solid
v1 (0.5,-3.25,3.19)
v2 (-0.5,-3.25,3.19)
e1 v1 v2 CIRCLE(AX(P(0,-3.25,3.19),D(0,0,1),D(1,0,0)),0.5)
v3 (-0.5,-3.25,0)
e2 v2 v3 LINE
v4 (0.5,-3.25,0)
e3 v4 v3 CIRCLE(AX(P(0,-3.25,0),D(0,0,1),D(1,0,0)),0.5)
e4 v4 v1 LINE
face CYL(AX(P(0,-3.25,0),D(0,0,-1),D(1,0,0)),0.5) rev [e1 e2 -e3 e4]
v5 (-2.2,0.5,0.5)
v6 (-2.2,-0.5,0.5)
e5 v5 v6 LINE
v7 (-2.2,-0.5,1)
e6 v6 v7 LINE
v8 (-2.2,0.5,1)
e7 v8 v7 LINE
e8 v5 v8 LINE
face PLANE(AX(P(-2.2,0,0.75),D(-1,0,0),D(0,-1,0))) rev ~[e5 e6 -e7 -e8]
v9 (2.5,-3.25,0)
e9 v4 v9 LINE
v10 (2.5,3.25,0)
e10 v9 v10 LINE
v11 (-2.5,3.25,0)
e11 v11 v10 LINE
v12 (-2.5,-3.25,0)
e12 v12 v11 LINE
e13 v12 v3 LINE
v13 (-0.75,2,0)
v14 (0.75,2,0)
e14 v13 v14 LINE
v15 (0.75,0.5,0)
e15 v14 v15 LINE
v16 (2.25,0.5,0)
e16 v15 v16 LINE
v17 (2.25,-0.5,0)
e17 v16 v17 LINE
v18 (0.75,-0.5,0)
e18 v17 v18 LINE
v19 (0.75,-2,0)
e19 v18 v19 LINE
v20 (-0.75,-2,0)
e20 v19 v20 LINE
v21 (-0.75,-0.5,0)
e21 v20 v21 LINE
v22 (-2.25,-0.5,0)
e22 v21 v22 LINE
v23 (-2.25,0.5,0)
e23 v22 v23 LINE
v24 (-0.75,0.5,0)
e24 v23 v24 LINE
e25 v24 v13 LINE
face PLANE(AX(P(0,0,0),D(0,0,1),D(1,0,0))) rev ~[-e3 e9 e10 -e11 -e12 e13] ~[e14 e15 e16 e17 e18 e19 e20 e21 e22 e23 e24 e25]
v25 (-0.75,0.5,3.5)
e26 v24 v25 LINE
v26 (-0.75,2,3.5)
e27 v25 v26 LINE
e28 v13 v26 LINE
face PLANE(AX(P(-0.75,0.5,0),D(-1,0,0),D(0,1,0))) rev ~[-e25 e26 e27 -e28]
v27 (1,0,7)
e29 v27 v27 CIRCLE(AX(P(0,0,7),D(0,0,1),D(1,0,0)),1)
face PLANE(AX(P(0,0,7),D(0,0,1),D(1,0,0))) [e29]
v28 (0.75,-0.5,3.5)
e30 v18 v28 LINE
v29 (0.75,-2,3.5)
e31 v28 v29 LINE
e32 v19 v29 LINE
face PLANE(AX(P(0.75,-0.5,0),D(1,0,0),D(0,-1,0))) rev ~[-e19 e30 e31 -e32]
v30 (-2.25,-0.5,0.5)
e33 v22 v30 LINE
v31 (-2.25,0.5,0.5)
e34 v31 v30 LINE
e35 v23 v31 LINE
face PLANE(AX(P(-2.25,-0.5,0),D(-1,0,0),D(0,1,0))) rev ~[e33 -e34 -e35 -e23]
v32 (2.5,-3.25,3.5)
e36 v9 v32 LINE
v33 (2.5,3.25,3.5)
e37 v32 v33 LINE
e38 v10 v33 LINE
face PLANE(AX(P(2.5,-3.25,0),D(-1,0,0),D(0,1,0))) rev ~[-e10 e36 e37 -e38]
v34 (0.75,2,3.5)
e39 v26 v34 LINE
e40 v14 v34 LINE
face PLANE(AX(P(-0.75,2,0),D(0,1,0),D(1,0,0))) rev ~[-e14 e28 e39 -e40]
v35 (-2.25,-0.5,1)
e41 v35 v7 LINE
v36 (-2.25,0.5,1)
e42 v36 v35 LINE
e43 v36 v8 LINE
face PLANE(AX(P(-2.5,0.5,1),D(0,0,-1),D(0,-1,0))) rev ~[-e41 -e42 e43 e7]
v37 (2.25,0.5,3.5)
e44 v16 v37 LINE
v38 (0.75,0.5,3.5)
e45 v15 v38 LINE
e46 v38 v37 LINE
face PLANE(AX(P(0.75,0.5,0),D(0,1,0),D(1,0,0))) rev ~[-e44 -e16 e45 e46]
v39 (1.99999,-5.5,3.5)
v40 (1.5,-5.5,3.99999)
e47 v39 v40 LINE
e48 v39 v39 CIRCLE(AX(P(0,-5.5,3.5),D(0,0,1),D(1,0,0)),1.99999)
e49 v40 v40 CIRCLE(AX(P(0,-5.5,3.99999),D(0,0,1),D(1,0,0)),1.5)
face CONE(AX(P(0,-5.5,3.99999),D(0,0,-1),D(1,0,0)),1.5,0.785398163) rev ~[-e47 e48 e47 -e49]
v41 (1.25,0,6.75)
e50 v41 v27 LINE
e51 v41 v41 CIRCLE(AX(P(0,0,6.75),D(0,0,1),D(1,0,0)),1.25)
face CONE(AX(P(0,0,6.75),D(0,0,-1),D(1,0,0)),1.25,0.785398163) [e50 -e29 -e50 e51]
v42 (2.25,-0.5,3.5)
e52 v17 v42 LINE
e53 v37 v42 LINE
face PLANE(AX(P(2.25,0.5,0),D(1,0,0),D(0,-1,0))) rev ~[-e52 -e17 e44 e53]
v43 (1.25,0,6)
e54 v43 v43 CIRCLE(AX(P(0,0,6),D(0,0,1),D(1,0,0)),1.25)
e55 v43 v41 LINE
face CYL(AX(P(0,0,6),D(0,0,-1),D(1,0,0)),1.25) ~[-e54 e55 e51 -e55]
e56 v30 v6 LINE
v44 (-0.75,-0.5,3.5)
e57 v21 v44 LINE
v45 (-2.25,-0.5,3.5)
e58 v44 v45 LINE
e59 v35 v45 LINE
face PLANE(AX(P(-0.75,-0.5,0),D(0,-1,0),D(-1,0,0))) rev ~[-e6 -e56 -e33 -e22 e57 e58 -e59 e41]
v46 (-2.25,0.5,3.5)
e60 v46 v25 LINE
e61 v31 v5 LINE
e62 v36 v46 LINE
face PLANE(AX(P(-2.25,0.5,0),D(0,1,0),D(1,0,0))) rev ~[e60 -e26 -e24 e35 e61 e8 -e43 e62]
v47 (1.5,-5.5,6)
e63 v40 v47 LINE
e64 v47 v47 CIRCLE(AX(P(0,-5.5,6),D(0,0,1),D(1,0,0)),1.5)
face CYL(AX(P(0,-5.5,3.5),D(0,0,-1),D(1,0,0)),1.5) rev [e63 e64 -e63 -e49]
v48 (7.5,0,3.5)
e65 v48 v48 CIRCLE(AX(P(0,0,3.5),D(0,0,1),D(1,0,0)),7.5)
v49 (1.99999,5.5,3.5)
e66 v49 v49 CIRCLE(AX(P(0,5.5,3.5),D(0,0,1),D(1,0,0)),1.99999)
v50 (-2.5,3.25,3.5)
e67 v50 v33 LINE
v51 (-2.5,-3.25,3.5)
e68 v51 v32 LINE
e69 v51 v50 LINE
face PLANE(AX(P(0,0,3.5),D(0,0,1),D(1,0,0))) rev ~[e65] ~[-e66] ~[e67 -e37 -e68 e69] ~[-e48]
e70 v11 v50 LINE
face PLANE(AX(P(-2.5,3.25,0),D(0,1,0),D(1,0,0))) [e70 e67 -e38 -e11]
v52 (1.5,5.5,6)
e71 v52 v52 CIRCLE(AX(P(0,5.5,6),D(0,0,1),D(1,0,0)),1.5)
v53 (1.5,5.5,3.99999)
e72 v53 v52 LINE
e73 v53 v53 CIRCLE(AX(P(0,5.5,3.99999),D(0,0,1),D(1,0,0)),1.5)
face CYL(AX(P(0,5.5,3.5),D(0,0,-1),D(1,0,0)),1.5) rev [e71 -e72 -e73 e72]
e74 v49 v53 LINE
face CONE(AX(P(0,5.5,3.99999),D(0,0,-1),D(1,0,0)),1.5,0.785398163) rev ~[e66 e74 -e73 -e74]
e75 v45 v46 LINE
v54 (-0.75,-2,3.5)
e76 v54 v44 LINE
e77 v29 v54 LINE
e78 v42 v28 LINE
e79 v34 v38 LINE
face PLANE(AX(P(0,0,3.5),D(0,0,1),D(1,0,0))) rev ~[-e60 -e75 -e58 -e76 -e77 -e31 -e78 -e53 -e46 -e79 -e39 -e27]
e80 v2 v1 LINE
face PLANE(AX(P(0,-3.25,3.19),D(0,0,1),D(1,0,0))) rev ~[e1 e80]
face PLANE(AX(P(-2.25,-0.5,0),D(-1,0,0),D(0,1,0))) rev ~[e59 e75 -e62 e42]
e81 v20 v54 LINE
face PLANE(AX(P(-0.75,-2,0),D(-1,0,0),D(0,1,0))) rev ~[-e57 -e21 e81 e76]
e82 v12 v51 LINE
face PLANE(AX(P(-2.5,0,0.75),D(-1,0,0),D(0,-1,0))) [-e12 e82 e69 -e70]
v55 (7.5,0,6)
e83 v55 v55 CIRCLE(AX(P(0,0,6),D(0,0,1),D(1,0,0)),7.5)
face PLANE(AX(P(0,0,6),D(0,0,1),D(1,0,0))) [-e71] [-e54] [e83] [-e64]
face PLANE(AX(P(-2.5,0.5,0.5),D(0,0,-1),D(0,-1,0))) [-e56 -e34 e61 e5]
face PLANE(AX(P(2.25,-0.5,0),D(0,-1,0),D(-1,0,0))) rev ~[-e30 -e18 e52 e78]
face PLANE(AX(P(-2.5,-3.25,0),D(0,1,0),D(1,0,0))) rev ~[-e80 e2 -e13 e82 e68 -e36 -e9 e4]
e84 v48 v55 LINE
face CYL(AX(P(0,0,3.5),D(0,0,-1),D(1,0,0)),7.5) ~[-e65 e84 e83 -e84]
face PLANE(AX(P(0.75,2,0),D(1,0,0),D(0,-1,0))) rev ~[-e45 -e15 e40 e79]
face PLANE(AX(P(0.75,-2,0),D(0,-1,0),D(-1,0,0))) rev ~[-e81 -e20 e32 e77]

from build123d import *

# Parameters (mm, degrees)
F0_W      = 5
F0_H      = 6.5
F1_DEPTH  = 3.5
F2_R      = 7.5
F2_R_2    = 1.5
F2_W      = 5
F2_H      = 6.5
F3_DEPTH  = 2.5
F4_R      = 1.25
F5_DEPTH  = 1
F6_SIZE   = 0.49999
F7_SIZE   = 0.25
F8_W      = 1
F8_H      = 0.5
F9_DEPTH  = 0.3
F10_R     = 0.5
F11_DEPTH = 3.19


# Not quite as in the source:
# - a fillet or chamfer is up to 0.001 mm smaller than in the source, because OpenCascade refuses the exact size


with BuildPart() as f1:
    # F0 (on Top) → F1 (new body)
    with BuildSketch(Plane.XY):
        Rectangle(F0_W, F0_H)
        Polygon((-0.75, -2), (-0.75, -0.5), (-2.25, -0.5), (-2.25, 0.5), (-0.75, 0.5), (-0.75, 2), (0.75, 2), (0.75, 0.5), (2.25, 0.5), (2.25, -0.5), (0.75, -0.5), (0.75, -2), align=None, mode=Mode.SUBTRACT)
    extrude(amount=F1_DEPTH)

    # F2 (on face) → F3 (join)
    with BuildSketch(Plane.XY.offset(3.5)):
        Circle(F2_R)
        with Locations((0, -5.5)):
            Circle(F2_R_2, mode=Mode.SUBTRACT)
        Rectangle(F2_W, F2_H, mode=Mode.SUBTRACT)
        with Locations((0, 5.5)):
            Circle(F2_R_2, mode=Mode.SUBTRACT)
        Rectangle(F2_W, F2_H)
        Polygon((0.75, -2), (-0.75, -2), (-0.75, -0.5), (-2.25, -0.5), (-2.25, 0.5), (-0.75, 0.5), (-0.75, 2), (0.75, 2), (0.75, 0.5), (2.25, 0.5), (2.25, -0.5), (0.75, -0.5), align=None, mode=Mode.SUBTRACT)
        Polygon((-0.75, -0.5), (-0.75, -2), (0.75, -2), (0.75, -0.5), (2.25, -0.5), (2.25, 0.5), (0.75, 0.5), (0.75, 2), (-0.75, 2), (-0.75, 0.5), (-2.25, 0.5), (-2.25, -0.5), align=None)
    extrude(amount=F3_DEPTH)

    # F4 (on face) → F5 (join)
    with BuildSketch(Plane.XY.offset(6)):
        Circle(F4_R)
    extrude(amount=F5_DEPTH)

    # F6 (size 0.5 in the source; OpenCascade refuses exactly that, so slightly less here)
    f6_edges = [f1.edges().sort_by_distance(p)[0] for p in [
        (-1.5, 5.5, 3.5),
        (-1.5, -5.5, 3.5),
    ]]
    chamfer(f6_edges, length=F6_SIZE)

    # F7
    f7_edges = [f1.edges().sort_by_distance(p)[0] for p in [
        (-1.25, 0, 7),
    ]]
    chamfer(f7_edges, length=F7_SIZE)

    # F8 (on face) → F9 (join)
    with BuildSketch(Plane(origin=(-2.5, 0, 0), x_dir=(0, -1, 0), z_dir=(-1, 0, 0))):
        with Locations((0, 0.75)):
            Rectangle(F8_W, F8_H)
    extrude(amount=-F9_DEPTH)

    # F10 (on face) → F11 (cut)
    with BuildSketch(Plane.XY):
        with Locations((0, -3.25)):
            Circle(F10_R)
    extrude(amount=F11_DEPTH, mode=Mode.SUBTRACT)


solid = f1.part
